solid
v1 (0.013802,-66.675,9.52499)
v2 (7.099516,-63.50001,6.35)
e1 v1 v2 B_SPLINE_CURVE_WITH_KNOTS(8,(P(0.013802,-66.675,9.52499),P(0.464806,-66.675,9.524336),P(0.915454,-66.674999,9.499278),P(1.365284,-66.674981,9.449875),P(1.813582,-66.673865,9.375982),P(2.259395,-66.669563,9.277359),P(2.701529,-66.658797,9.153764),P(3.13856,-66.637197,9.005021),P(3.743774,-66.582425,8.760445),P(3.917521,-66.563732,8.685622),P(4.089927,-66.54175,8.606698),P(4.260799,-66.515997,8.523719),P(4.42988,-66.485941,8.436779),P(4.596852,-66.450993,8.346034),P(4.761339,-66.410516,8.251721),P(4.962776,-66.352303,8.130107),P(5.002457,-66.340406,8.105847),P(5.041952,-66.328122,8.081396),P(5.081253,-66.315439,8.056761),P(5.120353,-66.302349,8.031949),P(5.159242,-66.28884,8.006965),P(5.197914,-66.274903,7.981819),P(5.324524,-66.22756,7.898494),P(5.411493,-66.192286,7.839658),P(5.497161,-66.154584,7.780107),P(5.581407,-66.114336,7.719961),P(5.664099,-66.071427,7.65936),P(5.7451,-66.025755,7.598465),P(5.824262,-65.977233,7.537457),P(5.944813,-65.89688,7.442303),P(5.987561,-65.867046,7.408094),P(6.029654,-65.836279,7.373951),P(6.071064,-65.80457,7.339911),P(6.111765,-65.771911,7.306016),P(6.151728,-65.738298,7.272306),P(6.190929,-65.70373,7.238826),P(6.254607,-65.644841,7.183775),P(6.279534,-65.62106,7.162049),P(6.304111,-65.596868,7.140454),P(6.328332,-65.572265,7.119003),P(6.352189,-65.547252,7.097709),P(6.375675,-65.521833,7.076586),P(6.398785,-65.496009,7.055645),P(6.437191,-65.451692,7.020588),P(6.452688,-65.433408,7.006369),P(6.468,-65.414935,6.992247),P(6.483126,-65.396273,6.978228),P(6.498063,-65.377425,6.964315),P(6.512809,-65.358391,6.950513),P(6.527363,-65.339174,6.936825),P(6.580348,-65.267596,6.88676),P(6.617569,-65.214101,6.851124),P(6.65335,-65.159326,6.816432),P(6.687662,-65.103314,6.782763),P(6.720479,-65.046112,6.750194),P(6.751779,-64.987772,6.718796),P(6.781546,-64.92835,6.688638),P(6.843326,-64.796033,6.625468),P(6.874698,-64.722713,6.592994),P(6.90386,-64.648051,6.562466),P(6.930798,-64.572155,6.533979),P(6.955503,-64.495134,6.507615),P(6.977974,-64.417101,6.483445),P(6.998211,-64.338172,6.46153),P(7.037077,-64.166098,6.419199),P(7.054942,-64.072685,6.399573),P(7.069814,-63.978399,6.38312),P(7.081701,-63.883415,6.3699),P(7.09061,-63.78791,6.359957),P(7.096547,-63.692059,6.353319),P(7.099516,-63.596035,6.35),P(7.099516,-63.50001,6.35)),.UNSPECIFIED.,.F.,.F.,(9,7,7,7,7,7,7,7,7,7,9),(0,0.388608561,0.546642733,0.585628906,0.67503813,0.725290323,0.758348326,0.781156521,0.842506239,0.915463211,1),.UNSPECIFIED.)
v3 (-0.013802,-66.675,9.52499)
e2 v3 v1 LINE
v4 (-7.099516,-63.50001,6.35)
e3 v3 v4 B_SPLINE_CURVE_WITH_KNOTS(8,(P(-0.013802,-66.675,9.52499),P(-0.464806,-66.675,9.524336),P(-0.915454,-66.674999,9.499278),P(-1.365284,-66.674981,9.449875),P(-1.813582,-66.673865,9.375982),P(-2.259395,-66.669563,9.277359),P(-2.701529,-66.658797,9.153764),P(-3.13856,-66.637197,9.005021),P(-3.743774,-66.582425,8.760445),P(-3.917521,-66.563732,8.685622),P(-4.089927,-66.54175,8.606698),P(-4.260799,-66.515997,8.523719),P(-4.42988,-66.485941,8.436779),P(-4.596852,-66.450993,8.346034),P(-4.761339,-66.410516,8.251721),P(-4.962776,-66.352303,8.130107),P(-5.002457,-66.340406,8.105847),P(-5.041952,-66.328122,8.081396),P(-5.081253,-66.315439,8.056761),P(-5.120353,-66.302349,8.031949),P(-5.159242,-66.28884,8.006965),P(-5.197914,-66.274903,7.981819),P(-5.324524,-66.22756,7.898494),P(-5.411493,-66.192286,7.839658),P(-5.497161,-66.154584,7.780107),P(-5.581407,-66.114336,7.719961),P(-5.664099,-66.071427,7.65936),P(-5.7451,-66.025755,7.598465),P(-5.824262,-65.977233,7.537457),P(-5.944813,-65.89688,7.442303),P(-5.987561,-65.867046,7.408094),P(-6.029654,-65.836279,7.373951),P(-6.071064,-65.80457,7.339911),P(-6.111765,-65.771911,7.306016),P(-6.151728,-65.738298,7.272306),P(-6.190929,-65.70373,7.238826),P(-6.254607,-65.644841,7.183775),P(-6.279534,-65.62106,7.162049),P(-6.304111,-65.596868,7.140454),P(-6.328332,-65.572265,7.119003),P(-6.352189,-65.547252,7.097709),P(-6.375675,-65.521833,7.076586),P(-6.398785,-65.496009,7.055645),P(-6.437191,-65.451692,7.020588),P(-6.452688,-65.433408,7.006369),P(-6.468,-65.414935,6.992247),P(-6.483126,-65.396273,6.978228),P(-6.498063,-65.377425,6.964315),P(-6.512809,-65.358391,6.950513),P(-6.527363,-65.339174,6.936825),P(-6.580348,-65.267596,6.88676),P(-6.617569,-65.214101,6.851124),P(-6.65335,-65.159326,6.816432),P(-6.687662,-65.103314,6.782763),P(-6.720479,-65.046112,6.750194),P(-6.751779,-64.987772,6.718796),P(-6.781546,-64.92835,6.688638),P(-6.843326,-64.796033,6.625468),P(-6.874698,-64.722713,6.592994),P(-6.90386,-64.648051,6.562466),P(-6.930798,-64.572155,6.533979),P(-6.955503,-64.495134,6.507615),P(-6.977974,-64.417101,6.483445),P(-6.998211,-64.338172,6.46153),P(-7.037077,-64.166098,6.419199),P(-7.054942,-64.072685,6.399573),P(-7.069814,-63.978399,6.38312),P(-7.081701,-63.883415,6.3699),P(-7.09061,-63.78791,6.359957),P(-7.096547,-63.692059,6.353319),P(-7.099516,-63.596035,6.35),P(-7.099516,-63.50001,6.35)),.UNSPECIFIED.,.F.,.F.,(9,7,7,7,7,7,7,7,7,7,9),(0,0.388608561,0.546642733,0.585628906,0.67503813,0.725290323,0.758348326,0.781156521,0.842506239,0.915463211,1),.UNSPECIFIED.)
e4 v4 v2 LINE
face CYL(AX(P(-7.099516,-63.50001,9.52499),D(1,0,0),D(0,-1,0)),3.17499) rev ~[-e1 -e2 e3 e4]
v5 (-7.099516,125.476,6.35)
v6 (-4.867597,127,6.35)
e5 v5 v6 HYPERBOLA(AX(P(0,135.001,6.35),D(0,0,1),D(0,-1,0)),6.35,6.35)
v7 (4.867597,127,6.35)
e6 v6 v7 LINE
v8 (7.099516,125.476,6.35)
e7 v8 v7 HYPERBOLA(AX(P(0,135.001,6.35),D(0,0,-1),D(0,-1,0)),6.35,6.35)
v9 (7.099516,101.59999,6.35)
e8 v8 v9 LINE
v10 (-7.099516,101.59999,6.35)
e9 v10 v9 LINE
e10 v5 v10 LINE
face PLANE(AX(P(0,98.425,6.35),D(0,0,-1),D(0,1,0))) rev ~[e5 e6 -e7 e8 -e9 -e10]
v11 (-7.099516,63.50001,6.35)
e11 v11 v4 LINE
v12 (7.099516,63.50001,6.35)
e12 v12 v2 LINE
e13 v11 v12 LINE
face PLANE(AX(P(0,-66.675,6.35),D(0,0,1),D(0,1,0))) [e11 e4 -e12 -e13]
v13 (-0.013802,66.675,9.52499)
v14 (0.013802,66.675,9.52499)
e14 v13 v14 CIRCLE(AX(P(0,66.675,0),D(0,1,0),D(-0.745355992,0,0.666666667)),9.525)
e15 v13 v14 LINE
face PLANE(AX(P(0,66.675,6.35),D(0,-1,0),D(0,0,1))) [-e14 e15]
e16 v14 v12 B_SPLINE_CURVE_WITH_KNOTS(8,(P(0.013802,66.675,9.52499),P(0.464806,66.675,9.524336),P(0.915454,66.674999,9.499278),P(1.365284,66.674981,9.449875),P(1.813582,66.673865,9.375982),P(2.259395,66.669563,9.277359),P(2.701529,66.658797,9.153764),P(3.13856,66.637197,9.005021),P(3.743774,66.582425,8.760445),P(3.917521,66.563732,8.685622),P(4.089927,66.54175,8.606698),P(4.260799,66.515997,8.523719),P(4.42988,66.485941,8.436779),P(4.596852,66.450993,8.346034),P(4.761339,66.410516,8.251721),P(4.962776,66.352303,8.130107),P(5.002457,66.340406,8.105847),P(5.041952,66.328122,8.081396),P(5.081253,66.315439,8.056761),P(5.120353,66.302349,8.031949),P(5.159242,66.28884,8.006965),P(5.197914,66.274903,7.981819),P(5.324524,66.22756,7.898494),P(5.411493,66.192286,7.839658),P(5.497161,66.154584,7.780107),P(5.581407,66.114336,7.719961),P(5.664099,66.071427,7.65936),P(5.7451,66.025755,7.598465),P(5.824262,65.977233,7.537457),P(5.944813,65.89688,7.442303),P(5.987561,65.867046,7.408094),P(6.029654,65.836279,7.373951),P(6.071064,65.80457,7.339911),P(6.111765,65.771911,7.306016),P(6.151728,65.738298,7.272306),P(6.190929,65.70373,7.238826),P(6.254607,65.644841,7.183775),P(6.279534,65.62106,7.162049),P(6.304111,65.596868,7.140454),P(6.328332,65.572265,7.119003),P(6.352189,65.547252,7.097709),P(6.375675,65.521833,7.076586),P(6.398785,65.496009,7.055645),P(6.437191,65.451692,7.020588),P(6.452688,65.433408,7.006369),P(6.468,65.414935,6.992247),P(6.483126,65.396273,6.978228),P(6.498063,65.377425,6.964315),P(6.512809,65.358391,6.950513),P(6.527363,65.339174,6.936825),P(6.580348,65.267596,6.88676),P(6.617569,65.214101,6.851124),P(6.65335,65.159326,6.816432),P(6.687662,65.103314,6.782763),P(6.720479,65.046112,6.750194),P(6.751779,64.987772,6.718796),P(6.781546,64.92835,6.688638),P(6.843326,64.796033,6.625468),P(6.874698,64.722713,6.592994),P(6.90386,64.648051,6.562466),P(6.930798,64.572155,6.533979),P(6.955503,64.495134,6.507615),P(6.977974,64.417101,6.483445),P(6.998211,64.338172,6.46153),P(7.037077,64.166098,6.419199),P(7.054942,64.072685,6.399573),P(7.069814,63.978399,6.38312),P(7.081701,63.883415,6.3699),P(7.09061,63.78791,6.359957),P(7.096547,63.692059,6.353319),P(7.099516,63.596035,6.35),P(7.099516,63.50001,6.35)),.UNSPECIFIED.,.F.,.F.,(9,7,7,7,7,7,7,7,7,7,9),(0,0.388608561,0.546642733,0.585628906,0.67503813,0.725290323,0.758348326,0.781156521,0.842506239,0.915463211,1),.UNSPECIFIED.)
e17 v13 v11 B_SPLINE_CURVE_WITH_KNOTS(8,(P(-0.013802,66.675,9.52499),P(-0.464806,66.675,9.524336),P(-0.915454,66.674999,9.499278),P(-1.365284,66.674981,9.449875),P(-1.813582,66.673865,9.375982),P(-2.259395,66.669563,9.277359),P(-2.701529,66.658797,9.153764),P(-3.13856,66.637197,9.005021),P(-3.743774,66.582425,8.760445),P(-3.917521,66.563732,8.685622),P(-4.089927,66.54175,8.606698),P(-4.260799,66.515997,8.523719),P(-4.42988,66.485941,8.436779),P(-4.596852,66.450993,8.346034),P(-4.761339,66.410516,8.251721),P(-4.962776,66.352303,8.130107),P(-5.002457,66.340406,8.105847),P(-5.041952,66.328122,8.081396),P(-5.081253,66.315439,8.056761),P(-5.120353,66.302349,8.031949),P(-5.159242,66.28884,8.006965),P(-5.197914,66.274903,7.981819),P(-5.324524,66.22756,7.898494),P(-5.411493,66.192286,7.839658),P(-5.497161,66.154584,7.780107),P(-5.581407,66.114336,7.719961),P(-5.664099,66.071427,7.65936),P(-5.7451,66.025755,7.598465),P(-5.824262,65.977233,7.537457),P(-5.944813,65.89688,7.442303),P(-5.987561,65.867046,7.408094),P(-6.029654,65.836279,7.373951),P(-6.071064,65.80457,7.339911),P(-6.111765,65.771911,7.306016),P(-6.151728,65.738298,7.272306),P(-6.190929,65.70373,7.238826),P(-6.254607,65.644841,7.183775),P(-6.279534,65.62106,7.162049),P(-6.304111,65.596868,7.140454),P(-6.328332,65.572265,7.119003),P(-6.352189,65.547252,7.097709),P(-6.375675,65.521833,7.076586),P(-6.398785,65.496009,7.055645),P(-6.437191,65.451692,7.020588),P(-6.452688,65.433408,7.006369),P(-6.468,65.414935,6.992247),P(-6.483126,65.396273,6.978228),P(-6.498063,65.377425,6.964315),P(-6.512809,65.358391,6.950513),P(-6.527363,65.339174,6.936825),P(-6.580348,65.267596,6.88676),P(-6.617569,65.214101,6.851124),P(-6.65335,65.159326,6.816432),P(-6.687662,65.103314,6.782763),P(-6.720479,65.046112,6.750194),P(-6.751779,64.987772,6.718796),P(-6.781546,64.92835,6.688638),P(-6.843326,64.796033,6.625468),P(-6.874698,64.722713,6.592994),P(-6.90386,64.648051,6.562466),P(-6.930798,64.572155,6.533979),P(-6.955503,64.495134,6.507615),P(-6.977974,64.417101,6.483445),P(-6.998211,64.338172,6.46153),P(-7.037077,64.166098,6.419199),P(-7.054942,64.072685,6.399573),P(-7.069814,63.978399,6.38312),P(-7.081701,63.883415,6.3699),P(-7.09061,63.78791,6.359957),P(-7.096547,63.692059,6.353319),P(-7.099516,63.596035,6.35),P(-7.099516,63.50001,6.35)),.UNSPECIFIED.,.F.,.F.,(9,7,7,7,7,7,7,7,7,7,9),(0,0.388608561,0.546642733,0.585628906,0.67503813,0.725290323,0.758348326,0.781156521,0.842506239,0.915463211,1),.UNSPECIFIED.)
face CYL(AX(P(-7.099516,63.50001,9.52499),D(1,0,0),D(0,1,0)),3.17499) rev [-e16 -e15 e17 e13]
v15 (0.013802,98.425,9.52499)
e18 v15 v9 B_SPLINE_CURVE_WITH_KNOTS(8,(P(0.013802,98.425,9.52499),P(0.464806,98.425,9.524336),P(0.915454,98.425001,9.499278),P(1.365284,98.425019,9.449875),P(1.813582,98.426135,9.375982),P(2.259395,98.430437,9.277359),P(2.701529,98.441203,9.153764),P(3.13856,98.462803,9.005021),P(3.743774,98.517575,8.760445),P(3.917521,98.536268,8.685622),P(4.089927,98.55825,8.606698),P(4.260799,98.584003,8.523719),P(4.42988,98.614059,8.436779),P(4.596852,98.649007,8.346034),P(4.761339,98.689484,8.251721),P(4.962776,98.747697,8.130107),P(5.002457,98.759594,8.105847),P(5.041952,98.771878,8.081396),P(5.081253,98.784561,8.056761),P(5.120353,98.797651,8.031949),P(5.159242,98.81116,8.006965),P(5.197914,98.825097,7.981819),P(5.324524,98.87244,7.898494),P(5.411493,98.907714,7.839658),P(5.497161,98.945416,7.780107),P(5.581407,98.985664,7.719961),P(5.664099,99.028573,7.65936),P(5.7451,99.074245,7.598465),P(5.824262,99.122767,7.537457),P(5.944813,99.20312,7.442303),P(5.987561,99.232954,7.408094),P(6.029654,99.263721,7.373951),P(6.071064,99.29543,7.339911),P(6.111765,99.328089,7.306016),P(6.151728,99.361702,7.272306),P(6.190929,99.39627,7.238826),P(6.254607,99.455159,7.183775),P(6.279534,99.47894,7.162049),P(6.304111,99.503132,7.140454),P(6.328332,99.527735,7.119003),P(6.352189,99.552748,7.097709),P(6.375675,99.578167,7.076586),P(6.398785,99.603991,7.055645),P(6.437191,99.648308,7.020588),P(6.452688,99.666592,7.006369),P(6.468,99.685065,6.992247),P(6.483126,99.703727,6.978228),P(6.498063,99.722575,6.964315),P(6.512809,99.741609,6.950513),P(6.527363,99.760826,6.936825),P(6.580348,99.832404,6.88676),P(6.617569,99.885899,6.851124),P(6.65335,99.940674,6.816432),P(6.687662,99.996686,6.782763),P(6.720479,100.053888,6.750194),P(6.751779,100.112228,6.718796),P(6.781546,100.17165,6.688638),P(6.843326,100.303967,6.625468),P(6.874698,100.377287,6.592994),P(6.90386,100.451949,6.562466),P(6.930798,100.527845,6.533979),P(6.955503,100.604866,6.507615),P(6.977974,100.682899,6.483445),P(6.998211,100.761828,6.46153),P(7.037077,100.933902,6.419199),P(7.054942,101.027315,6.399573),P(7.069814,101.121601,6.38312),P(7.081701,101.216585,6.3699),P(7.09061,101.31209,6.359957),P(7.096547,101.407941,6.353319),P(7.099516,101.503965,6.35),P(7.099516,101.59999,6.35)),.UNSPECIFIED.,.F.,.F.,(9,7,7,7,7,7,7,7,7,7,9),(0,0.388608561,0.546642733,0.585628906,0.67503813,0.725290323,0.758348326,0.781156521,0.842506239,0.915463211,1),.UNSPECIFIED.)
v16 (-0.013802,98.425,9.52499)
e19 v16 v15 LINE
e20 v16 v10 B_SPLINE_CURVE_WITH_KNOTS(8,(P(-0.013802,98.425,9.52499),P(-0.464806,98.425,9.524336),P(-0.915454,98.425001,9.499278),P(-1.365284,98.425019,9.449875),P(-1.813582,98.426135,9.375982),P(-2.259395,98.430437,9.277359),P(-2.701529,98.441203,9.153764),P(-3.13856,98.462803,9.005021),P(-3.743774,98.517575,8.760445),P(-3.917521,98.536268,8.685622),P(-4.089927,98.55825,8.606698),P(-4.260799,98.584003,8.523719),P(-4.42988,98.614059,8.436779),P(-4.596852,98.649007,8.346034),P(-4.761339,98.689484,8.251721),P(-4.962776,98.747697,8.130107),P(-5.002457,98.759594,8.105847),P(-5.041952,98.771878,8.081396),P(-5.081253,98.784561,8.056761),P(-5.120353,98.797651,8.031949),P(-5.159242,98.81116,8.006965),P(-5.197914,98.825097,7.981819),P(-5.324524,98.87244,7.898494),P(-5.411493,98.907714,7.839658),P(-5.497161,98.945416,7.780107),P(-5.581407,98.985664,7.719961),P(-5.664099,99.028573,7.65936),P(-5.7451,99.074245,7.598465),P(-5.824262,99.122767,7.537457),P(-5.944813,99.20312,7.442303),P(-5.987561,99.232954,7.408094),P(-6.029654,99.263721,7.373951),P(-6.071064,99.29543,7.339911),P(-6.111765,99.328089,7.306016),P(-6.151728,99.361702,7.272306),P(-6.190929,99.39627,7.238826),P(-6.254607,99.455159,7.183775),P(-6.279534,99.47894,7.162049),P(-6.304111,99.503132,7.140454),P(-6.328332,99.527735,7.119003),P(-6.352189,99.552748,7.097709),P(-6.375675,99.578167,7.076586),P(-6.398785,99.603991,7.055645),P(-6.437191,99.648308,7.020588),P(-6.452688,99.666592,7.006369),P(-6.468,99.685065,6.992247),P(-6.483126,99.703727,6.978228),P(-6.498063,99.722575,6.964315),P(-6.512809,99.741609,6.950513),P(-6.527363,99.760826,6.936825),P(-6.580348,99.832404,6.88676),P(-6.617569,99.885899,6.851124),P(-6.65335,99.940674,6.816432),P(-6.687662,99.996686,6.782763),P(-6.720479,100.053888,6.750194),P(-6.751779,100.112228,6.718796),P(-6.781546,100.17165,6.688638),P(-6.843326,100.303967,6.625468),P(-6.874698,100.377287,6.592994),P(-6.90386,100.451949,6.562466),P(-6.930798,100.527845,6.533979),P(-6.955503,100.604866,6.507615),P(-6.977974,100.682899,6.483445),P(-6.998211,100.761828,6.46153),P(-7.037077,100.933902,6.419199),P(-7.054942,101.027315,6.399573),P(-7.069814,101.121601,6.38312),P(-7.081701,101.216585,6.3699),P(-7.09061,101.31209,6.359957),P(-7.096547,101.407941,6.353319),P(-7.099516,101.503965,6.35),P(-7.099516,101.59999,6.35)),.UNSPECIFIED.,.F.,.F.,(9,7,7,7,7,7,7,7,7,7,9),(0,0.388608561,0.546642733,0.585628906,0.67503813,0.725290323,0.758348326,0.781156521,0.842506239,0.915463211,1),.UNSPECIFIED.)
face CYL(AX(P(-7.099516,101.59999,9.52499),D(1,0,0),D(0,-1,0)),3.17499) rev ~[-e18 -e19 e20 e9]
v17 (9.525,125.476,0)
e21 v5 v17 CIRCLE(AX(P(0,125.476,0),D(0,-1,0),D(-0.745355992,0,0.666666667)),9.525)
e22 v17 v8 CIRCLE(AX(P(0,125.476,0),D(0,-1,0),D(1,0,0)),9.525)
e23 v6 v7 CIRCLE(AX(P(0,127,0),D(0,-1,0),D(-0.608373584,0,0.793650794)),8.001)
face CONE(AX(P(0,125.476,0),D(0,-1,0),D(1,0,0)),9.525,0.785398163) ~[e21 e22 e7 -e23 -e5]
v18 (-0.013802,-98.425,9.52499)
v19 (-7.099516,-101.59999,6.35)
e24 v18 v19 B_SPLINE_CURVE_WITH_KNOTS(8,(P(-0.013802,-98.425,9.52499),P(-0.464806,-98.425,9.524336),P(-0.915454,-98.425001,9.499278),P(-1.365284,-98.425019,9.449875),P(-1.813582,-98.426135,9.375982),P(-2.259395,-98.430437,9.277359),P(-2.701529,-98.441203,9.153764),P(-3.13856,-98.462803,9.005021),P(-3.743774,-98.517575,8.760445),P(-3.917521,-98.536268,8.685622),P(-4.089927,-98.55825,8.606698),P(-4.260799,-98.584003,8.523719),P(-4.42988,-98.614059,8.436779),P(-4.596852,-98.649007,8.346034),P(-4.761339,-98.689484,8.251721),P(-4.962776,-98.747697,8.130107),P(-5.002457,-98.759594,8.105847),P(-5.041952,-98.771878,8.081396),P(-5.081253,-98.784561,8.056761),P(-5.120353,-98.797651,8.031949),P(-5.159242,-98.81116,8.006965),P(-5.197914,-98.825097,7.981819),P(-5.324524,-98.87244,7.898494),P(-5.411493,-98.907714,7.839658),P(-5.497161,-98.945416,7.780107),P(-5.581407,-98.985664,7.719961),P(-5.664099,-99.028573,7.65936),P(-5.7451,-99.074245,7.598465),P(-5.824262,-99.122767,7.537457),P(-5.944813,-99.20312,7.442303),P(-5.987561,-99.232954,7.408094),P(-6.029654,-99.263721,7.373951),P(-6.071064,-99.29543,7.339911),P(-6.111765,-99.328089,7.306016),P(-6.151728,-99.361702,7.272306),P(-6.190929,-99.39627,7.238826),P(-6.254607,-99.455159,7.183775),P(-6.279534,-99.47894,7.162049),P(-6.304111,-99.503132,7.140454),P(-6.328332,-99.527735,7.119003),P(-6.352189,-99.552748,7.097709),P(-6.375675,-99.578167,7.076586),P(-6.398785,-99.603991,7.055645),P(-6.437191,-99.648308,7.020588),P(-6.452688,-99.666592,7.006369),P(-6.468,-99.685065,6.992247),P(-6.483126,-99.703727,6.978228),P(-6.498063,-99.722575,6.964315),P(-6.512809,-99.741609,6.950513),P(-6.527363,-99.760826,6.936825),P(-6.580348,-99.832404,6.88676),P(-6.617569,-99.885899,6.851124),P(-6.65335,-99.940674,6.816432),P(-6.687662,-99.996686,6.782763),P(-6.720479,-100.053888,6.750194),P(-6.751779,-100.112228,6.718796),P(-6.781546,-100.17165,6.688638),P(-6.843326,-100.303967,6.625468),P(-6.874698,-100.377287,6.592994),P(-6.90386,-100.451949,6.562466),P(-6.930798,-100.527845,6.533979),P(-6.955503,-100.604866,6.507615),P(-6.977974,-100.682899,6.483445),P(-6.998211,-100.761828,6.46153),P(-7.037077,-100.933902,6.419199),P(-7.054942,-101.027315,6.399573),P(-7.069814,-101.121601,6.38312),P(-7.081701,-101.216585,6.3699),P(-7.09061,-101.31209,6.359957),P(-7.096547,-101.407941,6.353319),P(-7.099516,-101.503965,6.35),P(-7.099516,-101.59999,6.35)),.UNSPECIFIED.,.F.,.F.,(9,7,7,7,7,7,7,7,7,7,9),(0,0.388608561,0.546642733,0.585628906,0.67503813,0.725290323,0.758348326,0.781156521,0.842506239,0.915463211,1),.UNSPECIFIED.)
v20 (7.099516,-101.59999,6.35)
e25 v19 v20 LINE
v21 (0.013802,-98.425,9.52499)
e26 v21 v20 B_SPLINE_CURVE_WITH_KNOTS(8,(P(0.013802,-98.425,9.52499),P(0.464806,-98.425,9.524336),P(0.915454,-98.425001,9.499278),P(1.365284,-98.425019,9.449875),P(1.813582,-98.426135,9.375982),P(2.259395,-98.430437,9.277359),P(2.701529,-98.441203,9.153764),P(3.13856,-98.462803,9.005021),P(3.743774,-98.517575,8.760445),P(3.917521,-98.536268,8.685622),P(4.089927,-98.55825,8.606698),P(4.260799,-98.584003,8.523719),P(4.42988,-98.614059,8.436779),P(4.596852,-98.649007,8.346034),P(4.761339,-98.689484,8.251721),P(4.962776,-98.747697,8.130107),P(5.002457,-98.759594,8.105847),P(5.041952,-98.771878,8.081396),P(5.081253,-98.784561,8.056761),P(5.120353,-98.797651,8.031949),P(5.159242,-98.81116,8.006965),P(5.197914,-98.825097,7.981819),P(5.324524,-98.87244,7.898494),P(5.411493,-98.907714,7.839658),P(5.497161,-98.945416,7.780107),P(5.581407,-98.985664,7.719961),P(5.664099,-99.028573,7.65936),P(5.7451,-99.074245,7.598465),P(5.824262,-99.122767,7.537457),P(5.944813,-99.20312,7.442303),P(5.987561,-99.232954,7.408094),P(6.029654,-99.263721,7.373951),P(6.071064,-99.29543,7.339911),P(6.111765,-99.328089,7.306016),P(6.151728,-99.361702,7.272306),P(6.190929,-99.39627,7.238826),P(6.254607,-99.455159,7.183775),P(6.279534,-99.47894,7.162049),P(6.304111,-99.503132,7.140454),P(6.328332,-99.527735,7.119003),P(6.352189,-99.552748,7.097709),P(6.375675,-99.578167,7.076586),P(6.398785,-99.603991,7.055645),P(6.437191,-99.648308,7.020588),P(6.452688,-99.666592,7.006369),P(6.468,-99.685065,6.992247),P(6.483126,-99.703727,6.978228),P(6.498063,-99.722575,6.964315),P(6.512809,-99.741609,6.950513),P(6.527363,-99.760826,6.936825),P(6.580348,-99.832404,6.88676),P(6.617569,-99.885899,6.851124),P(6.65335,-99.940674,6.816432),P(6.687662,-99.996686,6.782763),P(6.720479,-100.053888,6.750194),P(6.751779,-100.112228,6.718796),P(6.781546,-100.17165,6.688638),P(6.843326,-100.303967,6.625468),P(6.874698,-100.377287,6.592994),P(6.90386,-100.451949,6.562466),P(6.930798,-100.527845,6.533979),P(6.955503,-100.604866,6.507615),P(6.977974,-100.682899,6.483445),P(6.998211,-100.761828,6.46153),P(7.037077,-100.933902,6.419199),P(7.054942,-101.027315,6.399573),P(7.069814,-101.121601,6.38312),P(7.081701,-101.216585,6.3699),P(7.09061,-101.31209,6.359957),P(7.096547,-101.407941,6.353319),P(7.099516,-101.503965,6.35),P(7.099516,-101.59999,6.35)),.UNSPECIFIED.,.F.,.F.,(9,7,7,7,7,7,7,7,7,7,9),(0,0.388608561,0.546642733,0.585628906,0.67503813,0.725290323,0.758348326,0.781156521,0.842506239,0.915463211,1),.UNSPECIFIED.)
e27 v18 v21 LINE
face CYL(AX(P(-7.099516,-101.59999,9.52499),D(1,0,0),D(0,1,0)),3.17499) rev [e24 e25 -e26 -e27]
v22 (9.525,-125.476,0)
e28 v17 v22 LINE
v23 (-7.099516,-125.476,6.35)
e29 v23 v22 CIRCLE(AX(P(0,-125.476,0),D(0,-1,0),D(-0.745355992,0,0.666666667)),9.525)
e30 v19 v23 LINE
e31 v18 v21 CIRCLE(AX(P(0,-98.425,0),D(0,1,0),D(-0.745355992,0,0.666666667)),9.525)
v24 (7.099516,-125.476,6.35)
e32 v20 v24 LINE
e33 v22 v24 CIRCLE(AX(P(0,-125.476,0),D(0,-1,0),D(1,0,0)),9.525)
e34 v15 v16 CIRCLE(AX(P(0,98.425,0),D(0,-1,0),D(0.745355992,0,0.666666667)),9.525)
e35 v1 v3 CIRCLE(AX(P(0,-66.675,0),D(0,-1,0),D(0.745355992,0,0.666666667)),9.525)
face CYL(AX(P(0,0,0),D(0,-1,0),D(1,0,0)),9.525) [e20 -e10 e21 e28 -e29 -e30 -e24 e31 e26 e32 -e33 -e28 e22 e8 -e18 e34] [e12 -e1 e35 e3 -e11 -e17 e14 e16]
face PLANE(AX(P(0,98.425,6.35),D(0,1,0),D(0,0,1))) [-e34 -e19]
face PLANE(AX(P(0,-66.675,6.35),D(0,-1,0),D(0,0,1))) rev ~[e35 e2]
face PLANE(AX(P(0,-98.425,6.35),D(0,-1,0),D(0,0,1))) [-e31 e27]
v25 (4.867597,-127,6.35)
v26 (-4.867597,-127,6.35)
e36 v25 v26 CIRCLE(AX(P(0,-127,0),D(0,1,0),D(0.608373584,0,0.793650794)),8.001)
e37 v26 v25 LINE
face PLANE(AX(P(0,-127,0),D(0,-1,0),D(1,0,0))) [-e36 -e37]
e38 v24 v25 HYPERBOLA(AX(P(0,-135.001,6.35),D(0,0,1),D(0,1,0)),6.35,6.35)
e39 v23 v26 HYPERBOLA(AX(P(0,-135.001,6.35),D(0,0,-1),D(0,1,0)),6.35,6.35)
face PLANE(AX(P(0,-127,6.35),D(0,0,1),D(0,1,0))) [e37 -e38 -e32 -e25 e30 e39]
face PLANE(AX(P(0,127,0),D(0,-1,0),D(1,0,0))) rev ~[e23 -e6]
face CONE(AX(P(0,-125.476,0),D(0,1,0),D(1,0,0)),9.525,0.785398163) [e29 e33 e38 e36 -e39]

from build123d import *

# Parameters (mm, degrees)
F0_R     = 9.525
F1_DEPTH = 127
F2_W     = 133.35
F2_H     = 3.175
F2_W_2   = 28.575
F3_DEPTH = 12.7
F4_SIZE  = 1.524
F5_R     = 3.17499


# Not quite as in the source:
# - a fillet or chamfer is up to 0.001 mm smaller than in the source, because OpenCascade refuses the exact size


with BuildPart() as f1:
    # F0 (on Front) → F1 (new body, symmetric)
    with BuildSketch(Plane.XZ):
        Circle(F0_R)
    extrude(amount=F1_DEPTH, both=True)

    # F2 (on Right) → F3 (cut, symmetric)
    with BuildSketch(Plane.YZ):
        with Locations((0, 7.9375)):
            Rectangle(F2_W, F2_H)
        with Locations((-112.7125, 7.9375)):
            Rectangle(F2_W_2, F2_H)
        with Locations((112.7125, 7.9375)):
            Rectangle(F2_W_2, F2_H)
    extrude(amount=F3_DEPTH, both=True, mode=Mode.SUBTRACT)

    # F4
    f4_edges = [f1.edges().sort_by_distance(p)[0] for p in [
        (-3.39873, -127, -8.897992),
        (-3.39873, 127, -8.897992),
    ]]
    chamfer(f4_edges, length=F4_SIZE)

    # F5 (radius 3.175 in the source; OpenCascade refuses exactly that, so slightly less here)
    f5_edges = [f1.edges().sort_by_distance(p)[0] for p in [
        (0, -98.425, 6.35),
        (0, 66.675, 6.35),
        (0, 98.425, 6.35),
        (0, -66.675, 6.35),
    ]]
    fillet(f5_edges, radius=F5_R)


solid = f1.part
